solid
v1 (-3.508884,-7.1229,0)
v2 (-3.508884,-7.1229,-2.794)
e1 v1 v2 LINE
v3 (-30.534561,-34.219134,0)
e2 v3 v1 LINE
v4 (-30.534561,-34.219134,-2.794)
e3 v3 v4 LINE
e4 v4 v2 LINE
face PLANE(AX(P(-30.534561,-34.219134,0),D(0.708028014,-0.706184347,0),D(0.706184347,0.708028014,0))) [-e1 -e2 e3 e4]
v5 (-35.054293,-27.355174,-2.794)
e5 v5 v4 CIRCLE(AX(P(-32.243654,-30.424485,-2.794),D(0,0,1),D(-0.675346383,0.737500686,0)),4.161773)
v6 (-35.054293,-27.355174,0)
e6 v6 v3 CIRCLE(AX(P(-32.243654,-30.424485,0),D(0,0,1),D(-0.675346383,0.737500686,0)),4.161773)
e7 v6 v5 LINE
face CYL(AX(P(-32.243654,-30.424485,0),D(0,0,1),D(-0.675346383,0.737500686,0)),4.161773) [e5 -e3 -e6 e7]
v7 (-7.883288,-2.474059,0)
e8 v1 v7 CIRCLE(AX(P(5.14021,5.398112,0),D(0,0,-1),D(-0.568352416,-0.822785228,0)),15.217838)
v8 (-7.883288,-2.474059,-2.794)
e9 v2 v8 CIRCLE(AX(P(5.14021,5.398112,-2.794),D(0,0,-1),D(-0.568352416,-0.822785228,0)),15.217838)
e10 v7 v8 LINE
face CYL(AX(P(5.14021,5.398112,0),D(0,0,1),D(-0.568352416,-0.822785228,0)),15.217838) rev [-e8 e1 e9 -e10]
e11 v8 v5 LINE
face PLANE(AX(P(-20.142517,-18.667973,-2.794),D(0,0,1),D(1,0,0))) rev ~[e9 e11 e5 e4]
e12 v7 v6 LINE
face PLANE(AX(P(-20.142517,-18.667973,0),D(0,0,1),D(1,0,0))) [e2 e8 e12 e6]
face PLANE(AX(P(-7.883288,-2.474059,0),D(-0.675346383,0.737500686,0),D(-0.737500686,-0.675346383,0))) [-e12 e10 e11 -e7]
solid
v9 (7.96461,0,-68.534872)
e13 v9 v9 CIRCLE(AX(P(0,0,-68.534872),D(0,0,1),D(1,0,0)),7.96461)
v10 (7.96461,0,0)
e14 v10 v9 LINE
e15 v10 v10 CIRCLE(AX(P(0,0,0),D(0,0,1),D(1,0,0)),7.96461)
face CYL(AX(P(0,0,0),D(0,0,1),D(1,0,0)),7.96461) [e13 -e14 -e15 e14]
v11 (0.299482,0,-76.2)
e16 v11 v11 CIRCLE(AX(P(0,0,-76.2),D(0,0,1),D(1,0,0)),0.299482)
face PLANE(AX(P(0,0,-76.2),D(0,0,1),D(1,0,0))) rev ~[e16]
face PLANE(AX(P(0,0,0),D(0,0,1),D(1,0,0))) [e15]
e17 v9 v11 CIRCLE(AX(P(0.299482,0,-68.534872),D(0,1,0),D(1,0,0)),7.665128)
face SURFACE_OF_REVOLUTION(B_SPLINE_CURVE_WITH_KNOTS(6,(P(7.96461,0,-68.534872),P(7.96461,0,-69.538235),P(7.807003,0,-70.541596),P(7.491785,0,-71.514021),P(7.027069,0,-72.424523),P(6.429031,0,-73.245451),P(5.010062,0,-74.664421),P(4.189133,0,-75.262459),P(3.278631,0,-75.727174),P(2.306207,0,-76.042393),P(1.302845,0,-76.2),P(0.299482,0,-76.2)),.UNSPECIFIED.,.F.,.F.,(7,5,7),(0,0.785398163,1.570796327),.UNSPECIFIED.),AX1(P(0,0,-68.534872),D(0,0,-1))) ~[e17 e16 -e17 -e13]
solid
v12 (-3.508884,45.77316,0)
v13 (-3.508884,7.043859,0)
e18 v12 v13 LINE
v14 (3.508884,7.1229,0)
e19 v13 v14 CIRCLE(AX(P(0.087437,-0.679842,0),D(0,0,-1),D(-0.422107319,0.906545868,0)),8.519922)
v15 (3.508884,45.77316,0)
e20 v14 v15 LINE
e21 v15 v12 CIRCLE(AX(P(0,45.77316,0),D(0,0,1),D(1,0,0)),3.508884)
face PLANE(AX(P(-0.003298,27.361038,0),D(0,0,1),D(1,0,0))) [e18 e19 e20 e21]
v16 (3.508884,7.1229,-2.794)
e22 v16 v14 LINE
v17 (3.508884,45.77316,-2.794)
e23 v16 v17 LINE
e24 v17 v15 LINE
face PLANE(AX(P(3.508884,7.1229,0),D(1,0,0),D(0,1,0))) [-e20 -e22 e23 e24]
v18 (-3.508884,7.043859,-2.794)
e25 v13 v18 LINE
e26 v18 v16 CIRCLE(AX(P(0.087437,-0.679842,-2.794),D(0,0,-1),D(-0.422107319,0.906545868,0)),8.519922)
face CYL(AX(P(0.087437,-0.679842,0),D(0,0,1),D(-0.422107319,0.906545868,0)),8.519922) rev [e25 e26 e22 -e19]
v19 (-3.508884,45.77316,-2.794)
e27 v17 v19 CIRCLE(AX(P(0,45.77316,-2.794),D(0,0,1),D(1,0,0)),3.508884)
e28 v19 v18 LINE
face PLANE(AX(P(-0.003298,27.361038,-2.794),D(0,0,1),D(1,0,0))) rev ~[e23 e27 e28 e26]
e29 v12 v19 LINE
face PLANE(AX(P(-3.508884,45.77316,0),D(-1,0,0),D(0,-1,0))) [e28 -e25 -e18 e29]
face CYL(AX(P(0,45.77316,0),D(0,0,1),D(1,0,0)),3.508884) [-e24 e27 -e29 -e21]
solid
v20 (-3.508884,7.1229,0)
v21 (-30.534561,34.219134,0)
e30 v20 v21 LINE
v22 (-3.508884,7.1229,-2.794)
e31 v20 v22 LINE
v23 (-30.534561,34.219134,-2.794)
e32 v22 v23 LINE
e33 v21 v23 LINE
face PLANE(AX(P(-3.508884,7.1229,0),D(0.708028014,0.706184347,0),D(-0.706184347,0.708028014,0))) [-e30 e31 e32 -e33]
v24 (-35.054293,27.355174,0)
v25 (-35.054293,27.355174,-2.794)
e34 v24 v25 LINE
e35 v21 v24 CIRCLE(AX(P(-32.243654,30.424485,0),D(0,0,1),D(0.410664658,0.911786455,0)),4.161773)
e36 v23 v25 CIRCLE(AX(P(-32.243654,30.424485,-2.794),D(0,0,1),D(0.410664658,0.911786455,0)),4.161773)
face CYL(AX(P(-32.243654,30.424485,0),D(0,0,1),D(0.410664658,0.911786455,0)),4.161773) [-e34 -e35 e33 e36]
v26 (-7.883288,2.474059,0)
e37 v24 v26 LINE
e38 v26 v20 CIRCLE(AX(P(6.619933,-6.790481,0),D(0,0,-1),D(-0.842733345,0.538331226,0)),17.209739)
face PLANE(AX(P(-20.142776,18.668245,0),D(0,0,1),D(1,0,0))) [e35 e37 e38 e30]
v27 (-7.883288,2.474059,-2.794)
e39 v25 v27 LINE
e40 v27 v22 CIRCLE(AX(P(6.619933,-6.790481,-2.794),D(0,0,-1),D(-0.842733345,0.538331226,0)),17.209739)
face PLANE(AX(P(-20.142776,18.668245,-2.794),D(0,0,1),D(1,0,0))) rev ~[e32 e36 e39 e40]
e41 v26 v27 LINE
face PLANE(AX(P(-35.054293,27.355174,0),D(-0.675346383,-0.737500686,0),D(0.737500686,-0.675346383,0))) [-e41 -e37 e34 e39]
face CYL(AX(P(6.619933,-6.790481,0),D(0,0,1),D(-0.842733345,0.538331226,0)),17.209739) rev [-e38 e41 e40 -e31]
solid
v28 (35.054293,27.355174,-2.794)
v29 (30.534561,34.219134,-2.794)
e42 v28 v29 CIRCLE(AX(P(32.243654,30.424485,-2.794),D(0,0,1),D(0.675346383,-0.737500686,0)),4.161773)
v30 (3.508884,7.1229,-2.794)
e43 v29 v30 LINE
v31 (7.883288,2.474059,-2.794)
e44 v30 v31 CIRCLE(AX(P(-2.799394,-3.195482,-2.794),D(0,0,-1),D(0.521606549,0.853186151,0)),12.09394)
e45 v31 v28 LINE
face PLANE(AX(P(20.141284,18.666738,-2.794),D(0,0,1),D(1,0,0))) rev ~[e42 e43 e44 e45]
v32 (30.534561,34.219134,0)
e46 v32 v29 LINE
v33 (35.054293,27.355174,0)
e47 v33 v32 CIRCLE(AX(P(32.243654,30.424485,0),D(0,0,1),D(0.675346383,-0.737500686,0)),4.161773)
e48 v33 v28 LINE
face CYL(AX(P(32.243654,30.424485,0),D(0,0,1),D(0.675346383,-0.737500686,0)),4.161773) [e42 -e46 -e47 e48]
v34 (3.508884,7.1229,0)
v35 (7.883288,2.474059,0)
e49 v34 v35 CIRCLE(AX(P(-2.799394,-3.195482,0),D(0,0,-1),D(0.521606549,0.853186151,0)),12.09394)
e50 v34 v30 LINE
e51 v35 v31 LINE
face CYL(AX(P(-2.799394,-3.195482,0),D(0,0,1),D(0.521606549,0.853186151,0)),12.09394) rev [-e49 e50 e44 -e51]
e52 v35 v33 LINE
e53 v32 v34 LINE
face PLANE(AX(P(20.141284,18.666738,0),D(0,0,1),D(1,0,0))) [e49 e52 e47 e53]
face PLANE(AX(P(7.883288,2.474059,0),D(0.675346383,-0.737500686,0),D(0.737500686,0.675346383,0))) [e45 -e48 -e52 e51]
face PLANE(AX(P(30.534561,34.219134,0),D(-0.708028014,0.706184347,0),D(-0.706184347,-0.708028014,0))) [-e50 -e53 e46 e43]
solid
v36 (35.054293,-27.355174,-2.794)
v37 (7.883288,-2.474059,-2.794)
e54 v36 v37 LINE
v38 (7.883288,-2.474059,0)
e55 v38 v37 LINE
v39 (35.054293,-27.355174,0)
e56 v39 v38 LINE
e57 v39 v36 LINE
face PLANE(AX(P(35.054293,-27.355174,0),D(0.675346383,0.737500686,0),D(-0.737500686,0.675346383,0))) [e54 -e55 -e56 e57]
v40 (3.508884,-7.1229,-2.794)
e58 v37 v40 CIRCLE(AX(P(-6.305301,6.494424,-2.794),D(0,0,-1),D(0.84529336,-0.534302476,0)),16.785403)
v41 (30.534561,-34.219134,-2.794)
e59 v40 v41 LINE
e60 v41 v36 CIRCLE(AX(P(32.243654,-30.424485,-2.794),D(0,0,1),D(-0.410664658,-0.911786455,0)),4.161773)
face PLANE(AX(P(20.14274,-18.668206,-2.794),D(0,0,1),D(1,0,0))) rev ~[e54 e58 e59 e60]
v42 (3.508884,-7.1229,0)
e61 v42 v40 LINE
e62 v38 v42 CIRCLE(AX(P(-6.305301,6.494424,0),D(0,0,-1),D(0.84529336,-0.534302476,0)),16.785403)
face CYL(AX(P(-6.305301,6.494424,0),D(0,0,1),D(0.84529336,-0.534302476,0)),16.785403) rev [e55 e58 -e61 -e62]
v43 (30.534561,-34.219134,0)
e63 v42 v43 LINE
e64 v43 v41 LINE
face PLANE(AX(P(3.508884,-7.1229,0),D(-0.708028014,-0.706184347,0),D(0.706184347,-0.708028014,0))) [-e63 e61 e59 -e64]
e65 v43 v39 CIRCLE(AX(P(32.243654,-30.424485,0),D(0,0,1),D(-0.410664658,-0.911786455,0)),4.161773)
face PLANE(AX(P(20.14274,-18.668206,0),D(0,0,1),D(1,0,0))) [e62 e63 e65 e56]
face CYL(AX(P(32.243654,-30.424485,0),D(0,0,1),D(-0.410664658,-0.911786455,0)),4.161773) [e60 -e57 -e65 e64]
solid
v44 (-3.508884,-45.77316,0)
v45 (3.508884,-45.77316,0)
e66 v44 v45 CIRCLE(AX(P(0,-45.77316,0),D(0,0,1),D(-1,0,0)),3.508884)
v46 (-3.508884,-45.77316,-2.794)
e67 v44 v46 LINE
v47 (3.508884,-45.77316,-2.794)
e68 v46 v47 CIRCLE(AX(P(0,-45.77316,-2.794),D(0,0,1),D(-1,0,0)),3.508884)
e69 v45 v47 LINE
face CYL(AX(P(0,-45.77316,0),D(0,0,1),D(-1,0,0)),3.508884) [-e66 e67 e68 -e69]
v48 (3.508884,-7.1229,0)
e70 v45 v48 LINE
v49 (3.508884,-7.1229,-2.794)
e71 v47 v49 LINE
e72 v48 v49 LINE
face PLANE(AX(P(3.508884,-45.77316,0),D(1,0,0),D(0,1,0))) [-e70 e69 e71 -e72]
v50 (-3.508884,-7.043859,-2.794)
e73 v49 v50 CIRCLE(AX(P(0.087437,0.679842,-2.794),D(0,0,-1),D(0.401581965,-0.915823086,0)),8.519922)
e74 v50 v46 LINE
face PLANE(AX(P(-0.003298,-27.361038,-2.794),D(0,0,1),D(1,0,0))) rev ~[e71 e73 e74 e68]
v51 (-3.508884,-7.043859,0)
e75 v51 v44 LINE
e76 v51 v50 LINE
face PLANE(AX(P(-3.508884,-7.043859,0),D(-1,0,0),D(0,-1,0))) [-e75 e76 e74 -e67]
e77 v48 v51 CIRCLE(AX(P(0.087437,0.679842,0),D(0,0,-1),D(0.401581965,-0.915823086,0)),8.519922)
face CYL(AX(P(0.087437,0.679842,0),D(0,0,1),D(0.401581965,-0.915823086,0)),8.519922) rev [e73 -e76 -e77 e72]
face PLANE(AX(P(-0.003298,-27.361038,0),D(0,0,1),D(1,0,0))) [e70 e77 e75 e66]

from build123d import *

# Parameters (mm, degrees)
F0_R     = 7.9646104271
F1_DEPTH = 76.2
F3_DEPTH = 1.27
F4_DEPTH = 2.794
F5_R     = 7.6651280605


with BuildPart() as f1:
    # F0 (on Top) → F1 (new body)
    with BuildSketch(Plane.XY):
        Circle(F0_R)
    extrude(amount=-F1_DEPTH)

    # F5
    f5_edges = [f1.edges().sort_by_distance(p)[0] for p in [
        (-7.96461, 0, -76.2),
    ]]
    fillet(f5_edges, radius=F5_R)


with BuildPart() as f3:
    # F2 (on Top) → F3 (new body)
    with BuildSketch(Plane.XY):
        with BuildLine():
            Line((-3.5088843636, 7.1228999505), (-3.5088843636, 7.0438587708))
            ThreePointArc((-3.5088843636, 7.0438587708), (-0.0085166469, 7.8395403691), (3.5088843636, 7.1228999505))
            Line((3.5088843636, 7.1228999505), (3.5088843636, 45.7731597126))
            ThreePointArc((3.5088843636, 45.7731597126), (0, 49.2820440761), (-3.5088843636, 45.7731597126))
            Line((-3.5088843636, 45.7731597126), (-3.5088843636, 7.1228999505))
        make_face()
    extrude(amount=-F3_DEPTH)

    # F2 (on Top) → F4, piece 3 (join)
    with BuildSketch(Plane.XY):
        with BuildLine():
            Line((-3.5088843636, 7.1228999505), (-3.5088843636, 7.0438587708))
            ThreePointArc((-3.5088843636, 7.0438587708), (-0.0085166469, 7.8395403691), (3.5088843636, 7.1228999505))
            Line((3.5088843636, 7.1228999505), (3.5088843636, 45.7731597126))
            ThreePointArc((3.5088843636, 45.7731597126), (0, 49.2820440761), (-3.5088843636, 45.7731597126))
            Line((-3.5088843636, 45.7731597126), (-3.5088843636, 7.1228999505))
        make_face()
    extrude(amount=-F4_DEPTH)


with BuildPart() as f4:
    # F2 (on Top) → F4 (new body)
    with BuildSketch(Plane.XY):
        with BuildLine():
            ThreePointArc((-7.8832879663, 2.4740586523), (-5.9135126334, 5.0030703093), (-3.5088843636, 7.1228999505))
            Line((-3.5088843636, 7.1228999505), (-30.534560875, 34.2191336145))
            ThreePointArc((-30.534560875, 34.2191336145), (-35.7195475655, 32.7132669375), (-35.0542927591, 27.3551742292))
            Line((-35.0542927591, 27.3551742292), (-7.8832879663, 2.4740586523))
        make_face()
    extrude(amount=-F4_DEPTH)


with BuildPart() as f4b:
    # F2 (on Top) → F4, piece 2 (new body)
    with BuildSketch(Plane.XY):
        with BuildLine():
            Line((30.534560875, 34.2191336145), (3.5088843636, 7.1228999505))
            ThreePointArc((3.5088843636, 7.1228999505), (6.0083363832, 5.0922962748), (7.8832879663, 2.4740586523))
            Line((7.8832879663, 2.4740586523), (35.0542927591, 27.3551742292))
            ThreePointArc((35.0542927591, 27.3551742292), (35.7195475655, 32.7132669375), (30.534560875, 34.2191336145))
        make_face()
    extrude(amount=-F4_DEPTH)


with BuildPart() as f4c:
    # F2 (on Top) → F4, piece 4 (new body)
    with BuildSketch(Plane.XY):
        with BuildLine():
            ThreePointArc((3.5088843636, -7.1228999505), (-0.0085166469, -7.8395403691), (-3.5088843636, -7.0438587708))
            Line((-3.5088843636, -7.0438587708), (-3.5088843636, -7.1228999505))
            Line((-3.5088843636, -7.1228999505), (-3.5088843636, -45.7731597126))
            ThreePointArc((-3.5088843636, -45.7731597126), (0, -49.2820440761), (3.5088843636, -45.7731597126))
            Line((3.5088843636, -45.7731597126), (3.5088843636, -7.1228999505))
        make_face()
    extrude(amount=-F4_DEPTH)


with BuildPart() as f4d:
    # F2 (on Top) → F4, piece 5 (new body)
    with BuildSketch(Plane.XY):
        with BuildLine():
            ThreePointArc((7.8832879663, -2.4740586523), (5.9191100309, -5.0083372725), (3.5088843636, -7.1228999505))
            Line((3.5088843636, -7.1228999505), (30.534560875, -34.2191336145))
            ThreePointArc((30.534560875, -34.2191336145), (35.7195475655, -32.7132669375), (35.0542927591, -27.3551742292))
            Line((35.0542927591, -27.3551742292), (7.8832879663, -2.4740586523))
        make_face()
    extrude(amount=-F4_DEPTH)


with BuildPart() as f4e:
    # F2 (on Top) → F4, piece 6 (new body)
    with BuildSketch(Plane.XY):
        with BuildLine():
            Line((-30.534560875, -34.2191336145), (-3.5088843636, -7.1228999505))
            ThreePointArc((-3.5088843636, -7.1228999505), (-5.9425805218, -5.0304222166), (-7.8832879663, -2.4740586523))
            Line((-7.8832879663, -2.4740586523), (-35.0542927591, -27.3551742292))
            ThreePointArc((-35.0542927591, -27.3551742292), (-35.7195475655, -32.7132669375), (-30.534560875, -34.2191336145))
        make_face()
    extrude(amount=-F4_DEPTH)


solid = Compound([f1.part, f3.part, f4.part, f4b.part, f4c.part, f4d.part, f4e.part])
